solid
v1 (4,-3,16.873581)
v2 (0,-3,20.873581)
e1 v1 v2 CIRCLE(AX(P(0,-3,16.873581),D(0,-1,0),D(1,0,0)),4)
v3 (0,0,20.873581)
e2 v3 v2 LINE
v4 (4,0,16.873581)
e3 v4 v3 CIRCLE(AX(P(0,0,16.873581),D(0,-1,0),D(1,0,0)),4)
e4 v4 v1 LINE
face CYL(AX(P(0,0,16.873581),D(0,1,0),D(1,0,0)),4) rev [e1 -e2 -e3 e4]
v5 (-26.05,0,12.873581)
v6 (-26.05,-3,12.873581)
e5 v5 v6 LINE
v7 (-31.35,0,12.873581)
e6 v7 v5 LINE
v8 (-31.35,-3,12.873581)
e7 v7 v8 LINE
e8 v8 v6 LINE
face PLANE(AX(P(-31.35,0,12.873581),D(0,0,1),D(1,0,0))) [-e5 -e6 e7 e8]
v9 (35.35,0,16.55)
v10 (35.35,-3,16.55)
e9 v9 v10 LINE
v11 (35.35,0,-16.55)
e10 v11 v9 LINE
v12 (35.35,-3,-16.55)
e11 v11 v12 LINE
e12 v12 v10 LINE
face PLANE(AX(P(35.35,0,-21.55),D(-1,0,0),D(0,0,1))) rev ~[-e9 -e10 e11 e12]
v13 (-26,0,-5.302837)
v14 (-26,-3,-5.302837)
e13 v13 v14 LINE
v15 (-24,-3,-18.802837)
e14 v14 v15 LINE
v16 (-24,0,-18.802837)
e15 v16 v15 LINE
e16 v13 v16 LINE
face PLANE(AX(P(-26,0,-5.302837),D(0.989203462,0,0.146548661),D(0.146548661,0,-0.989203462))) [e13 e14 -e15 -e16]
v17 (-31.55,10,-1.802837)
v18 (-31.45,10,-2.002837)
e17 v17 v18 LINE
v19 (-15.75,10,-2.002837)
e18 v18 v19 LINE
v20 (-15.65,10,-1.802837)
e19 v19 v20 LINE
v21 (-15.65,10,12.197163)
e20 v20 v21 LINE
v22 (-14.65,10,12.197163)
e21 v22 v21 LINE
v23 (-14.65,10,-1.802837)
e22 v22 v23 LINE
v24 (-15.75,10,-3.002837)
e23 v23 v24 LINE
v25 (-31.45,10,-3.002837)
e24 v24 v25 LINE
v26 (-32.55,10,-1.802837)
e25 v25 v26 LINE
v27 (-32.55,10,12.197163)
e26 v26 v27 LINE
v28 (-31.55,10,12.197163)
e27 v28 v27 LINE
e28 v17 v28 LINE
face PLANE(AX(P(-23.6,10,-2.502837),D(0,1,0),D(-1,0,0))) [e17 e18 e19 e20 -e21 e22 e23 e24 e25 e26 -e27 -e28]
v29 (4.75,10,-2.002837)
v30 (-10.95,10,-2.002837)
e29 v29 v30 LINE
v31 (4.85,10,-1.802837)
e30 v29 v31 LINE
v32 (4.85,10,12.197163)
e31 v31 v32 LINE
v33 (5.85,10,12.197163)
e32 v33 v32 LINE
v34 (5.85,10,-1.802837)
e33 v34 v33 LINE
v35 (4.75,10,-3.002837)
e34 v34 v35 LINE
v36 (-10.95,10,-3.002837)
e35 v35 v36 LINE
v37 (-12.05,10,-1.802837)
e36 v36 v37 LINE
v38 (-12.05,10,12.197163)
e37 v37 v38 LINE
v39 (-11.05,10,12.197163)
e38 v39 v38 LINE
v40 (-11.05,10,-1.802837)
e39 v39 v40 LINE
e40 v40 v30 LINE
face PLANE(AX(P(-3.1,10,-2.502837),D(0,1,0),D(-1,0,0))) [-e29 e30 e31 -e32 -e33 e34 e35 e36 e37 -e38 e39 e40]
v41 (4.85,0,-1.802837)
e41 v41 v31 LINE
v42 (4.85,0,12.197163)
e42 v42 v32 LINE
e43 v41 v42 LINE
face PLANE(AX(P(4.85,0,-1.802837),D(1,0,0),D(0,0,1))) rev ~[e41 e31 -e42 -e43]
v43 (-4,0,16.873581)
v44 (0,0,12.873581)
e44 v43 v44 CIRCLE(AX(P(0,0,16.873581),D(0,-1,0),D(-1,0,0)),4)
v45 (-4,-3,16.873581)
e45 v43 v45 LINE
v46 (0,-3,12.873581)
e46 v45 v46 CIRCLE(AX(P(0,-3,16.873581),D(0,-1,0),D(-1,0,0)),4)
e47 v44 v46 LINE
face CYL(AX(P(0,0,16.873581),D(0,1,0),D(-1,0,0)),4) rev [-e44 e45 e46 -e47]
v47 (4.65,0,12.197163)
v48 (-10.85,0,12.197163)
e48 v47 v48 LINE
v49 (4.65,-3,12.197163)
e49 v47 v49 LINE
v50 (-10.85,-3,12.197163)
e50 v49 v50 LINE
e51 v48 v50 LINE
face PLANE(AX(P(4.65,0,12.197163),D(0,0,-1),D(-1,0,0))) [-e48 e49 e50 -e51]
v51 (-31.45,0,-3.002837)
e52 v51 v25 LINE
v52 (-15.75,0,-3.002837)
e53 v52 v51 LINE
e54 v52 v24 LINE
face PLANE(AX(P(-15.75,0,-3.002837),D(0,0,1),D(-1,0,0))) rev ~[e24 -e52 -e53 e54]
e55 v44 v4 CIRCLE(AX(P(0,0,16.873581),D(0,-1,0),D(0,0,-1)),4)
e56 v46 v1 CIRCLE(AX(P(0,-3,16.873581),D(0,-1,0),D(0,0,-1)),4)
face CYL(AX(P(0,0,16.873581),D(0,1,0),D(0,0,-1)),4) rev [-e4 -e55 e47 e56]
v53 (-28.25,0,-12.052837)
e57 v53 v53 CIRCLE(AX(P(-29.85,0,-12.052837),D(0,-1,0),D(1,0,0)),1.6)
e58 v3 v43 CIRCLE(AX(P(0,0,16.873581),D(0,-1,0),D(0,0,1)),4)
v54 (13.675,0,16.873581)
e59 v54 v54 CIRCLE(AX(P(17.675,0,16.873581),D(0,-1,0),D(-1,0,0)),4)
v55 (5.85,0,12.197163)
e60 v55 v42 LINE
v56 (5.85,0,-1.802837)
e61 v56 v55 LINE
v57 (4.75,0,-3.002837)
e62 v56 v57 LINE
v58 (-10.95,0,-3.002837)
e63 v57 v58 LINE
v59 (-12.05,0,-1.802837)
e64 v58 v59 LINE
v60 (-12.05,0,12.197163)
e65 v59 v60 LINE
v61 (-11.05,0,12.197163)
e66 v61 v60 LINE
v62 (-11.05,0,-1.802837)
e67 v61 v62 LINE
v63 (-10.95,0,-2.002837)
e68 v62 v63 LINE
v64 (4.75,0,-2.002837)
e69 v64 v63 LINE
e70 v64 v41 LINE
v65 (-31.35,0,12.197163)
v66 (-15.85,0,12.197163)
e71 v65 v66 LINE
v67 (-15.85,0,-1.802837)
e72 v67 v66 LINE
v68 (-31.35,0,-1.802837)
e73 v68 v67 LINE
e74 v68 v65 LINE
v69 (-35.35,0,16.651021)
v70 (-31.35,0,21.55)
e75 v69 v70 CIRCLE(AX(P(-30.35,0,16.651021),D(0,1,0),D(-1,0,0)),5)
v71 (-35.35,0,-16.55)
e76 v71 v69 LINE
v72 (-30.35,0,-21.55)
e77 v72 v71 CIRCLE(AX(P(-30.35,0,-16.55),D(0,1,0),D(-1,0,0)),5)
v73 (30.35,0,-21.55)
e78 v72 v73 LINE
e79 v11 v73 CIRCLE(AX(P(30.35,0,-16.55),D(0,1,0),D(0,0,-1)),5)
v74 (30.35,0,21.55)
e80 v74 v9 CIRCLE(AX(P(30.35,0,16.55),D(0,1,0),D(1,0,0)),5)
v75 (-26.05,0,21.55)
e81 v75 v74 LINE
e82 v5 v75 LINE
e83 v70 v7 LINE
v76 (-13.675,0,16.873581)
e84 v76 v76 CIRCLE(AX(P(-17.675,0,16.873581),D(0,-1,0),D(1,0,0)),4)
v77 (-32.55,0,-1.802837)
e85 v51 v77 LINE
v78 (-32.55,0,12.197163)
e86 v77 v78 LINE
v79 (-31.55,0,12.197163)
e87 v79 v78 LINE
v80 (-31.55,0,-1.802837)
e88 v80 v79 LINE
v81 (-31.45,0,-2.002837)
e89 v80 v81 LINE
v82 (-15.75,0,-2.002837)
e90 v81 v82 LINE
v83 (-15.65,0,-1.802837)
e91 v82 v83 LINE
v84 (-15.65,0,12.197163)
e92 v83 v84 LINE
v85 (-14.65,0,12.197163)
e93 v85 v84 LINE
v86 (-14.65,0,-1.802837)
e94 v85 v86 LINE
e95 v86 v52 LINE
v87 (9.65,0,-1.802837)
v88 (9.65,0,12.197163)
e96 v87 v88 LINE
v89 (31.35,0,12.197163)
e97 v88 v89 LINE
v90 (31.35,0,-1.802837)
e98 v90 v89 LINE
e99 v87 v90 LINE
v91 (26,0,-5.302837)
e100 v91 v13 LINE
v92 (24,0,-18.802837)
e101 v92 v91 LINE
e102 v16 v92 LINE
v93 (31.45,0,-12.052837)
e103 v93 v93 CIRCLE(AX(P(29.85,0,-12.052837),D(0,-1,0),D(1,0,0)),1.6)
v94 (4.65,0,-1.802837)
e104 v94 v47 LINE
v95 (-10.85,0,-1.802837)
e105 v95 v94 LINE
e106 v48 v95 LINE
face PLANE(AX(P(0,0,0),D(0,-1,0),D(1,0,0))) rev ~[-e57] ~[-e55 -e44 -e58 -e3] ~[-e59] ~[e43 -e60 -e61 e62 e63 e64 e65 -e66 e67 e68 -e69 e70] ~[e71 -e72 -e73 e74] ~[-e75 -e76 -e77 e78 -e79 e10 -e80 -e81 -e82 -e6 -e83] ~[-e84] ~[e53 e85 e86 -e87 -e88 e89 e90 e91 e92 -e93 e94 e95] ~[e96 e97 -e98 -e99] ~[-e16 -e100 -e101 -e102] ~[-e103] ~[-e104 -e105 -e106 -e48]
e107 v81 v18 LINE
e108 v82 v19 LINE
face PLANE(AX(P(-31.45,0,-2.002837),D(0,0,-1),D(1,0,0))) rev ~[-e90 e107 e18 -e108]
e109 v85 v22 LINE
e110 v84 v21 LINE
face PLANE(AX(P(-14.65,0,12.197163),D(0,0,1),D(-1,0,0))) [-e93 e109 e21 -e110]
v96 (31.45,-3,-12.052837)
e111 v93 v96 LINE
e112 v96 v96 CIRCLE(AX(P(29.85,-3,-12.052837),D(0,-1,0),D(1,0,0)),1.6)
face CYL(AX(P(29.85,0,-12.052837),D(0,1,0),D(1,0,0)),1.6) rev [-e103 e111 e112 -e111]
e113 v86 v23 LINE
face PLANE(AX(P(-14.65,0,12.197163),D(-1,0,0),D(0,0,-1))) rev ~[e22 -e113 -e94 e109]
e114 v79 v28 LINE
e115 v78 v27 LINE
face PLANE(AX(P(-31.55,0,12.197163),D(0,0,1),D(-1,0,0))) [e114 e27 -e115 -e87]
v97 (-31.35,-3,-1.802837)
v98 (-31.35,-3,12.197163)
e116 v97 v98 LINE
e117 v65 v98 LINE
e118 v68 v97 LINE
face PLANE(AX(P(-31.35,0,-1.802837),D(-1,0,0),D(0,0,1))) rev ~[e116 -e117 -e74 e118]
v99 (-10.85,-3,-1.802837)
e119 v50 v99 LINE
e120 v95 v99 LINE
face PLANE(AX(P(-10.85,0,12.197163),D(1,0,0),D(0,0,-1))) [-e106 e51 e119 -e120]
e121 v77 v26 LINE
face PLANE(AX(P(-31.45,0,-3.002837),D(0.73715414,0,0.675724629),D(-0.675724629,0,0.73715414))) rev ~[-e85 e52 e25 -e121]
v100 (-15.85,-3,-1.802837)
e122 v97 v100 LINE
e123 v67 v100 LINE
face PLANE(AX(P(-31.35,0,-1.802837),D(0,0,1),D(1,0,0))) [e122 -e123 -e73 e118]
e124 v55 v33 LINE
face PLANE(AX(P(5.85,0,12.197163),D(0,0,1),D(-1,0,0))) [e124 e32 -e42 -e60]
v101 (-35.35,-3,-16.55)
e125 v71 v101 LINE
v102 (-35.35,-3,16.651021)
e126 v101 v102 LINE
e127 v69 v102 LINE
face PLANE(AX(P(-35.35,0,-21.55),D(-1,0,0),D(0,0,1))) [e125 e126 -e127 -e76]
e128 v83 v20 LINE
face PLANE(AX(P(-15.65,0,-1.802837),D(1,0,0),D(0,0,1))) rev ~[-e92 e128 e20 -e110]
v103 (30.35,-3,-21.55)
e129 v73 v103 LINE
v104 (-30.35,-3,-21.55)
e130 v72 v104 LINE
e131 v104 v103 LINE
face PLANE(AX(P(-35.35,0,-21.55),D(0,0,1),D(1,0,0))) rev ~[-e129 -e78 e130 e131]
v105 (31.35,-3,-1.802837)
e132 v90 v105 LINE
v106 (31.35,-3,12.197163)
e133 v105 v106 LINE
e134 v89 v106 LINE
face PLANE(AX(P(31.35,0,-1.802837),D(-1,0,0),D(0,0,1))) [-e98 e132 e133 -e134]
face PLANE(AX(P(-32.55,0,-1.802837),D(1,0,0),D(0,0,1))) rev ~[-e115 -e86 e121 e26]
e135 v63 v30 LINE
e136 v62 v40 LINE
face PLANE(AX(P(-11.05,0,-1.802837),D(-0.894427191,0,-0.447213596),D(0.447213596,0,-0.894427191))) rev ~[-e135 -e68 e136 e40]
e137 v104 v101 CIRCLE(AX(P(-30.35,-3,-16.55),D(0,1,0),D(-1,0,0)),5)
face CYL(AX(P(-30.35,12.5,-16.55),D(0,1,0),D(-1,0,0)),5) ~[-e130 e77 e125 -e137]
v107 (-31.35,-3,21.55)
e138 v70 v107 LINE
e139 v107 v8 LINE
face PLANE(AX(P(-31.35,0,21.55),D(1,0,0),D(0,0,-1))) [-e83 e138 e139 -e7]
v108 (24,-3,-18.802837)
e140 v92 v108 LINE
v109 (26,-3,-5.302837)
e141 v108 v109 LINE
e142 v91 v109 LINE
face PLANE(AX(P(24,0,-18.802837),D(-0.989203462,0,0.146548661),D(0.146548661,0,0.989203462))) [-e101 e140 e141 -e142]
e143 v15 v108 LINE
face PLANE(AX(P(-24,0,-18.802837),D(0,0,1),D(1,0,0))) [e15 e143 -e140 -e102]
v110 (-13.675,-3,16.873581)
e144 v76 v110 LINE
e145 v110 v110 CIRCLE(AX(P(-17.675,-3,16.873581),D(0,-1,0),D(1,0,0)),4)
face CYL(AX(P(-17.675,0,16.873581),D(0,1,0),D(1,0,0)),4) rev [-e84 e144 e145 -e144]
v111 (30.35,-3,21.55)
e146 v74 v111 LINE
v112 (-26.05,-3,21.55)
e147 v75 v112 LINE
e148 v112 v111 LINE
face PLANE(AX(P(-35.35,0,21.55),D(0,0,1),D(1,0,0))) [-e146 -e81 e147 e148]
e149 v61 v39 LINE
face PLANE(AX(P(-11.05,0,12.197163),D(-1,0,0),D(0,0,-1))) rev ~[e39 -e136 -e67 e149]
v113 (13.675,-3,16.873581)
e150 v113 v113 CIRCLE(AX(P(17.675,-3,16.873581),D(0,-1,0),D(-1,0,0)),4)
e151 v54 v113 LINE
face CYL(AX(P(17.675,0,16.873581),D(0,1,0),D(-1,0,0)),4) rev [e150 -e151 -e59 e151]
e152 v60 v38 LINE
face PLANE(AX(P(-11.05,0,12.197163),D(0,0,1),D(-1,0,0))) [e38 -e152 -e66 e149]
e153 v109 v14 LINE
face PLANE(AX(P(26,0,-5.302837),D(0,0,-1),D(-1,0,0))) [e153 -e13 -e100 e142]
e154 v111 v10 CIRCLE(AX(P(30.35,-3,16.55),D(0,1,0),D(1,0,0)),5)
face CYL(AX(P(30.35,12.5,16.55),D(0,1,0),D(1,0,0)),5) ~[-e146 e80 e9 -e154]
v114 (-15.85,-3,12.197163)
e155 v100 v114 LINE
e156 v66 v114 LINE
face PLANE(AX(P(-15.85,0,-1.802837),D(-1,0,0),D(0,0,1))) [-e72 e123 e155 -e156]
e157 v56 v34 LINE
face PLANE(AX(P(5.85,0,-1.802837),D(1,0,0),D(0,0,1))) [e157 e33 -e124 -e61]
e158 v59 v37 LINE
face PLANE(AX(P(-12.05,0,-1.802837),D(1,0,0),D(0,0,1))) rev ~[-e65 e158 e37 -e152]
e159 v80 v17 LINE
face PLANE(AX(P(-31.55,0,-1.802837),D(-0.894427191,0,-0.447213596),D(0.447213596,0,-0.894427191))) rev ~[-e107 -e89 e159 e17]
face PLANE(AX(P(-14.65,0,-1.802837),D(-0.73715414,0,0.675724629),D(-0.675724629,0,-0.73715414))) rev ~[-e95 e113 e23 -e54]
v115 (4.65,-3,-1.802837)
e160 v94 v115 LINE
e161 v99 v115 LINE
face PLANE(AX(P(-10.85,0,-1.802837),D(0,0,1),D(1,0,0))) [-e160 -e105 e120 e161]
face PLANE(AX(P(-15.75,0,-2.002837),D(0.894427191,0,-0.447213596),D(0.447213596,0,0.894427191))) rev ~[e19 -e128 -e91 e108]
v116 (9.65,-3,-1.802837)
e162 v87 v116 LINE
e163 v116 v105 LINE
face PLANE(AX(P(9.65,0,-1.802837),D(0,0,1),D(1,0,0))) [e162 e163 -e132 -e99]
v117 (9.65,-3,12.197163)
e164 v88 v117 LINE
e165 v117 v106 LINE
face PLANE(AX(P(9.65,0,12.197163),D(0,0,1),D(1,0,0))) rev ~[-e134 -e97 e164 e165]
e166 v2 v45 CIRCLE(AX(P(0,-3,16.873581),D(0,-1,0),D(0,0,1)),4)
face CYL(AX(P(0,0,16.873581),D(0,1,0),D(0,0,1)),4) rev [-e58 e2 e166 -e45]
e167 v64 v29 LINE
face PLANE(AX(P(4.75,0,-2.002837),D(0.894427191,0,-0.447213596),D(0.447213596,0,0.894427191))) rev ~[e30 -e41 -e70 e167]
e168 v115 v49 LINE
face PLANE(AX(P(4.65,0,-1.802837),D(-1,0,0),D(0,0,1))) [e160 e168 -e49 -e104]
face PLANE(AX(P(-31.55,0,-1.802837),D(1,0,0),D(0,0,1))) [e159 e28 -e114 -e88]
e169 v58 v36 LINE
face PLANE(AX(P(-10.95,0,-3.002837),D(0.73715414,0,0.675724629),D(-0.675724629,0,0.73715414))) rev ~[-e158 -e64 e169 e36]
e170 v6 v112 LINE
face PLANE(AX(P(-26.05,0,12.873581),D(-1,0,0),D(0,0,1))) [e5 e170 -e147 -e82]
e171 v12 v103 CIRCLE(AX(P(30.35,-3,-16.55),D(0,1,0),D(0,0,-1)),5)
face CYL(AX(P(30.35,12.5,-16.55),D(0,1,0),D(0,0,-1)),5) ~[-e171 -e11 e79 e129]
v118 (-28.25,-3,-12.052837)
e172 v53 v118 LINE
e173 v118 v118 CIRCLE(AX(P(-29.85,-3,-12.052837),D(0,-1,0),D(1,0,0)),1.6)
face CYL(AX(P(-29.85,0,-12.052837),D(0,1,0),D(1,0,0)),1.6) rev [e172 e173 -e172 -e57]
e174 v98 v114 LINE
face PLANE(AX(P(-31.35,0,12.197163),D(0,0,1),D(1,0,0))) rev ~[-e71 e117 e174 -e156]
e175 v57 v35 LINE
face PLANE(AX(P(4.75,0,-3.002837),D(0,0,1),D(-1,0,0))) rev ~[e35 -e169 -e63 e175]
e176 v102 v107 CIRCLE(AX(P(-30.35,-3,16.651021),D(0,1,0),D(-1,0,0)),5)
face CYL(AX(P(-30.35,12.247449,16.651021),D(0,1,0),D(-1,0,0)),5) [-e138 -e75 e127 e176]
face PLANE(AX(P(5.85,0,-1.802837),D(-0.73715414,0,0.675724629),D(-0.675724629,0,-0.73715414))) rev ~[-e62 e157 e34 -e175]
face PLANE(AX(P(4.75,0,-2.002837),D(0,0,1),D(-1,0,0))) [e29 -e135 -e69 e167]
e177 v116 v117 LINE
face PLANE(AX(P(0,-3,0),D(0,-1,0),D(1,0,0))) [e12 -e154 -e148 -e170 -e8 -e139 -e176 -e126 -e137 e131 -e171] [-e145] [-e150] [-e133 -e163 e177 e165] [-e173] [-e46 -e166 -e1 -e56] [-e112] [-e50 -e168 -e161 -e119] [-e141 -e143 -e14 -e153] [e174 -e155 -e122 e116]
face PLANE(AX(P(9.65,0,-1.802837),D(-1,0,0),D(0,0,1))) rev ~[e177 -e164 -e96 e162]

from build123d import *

# Parameters (mm, degrees)
F0_W        = 70.7
F0_H        = 43.1
F3_DEPTH    = 3
F1_R        = 1.6
F4_DEPTH    = 3
F2_W        = 15.5
F2_H        = 14
F2_W_2      = 5.3
F2_H_2      = 4
F2_H_3      = 4.6764186437
F2_W_3      = 21.7
F5_DEPTH    = 3
F6_T1_DEPTH = 27.4948974279
F6_T3_DEPTH = 28
F7_W        = 1
F7_H        = 14
F7_H_2      = 7
F7_W_2      = 15.7
F7_H_3      = 1
F8_DEPTH    = 10


# Not quite as in the source:
# - a fillet or chamfer that OpenCascade refuses, or shapes differently, is made with other operations: its cross-section is extruded or revolved along the edge and cut away or added


with BuildPart() as f3:
    # F0 (on Front) → F3 (new body)
    with BuildSketch(Plane.XZ):
        Rectangle(F0_W, F0_H)
    extrude(amount=F3_DEPTH)

    # F1 (on face) → F4 (cut)
    with BuildSketch(Plane.XZ):
        Polygon((0, -12.0528372875), (0, -18.8028372875), (24, -18.8028372875), (26, -5.3028372875), (0, -5.3028372875), align=None)
        Polygon((-24, -18.8028372875), (0, -18.8028372875), (0, -12.0528372875), (-25, -12.0528372875), align=None)
        with Locations((-29.85, -12.0528372875)):
            Circle(F1_R)
        Polygon((-25, -12.0528372875), (0, -12.0528372875), (0, -5.3028372875), (-26, -5.3028372875), align=None)
        with Locations((29.85, -12.0528372875)):
            Circle(F1_R)
    extrude(amount=F4_DEPTH, mode=Mode.SUBTRACT)

    # F2 (on face) → F5 (cut)
    with BuildSketch(Plane.XZ):
        with Locations((-23.6, 5.1971627125)):
            Rectangle(F2_W, F2_H)
        with Locations((-28.7, 14.8735813563)):
            Rectangle(F2_W_2, F2_H_2)
        with Locations((-28.7, 19.2117906781)):
            Rectangle(F2_W_2, F2_H_3)
        with BuildLine():
            ThreePointArc((-21.675, 16.8735813563), (-17.675, 12.8735813563), (-13.675, 16.8735813563))
            Line((-13.675, 16.8735813563), (-21.675, 16.8735813563))
        make_face()
        with BuildLine():
            Line((-21.675, 16.8735813563), (-13.675, 16.8735813563))
            ThreePointArc((-13.675, 16.8735813563), (-17.675, 20.8735813563), (-21.675, 16.8735813563))
        make_face()
        with BuildLine():
            ThreePointArc((21.675, 16.8735813563), (17.675, 20.8735813563), (13.675, 16.8735813563))
            Line((13.675, 16.8735813563), (21.675, 16.8735813563))
        make_face()
        with BuildLine():
            Line((21.675, 16.8735813563), (13.675, 16.8735813563))
            ThreePointArc((13.675, 16.8735813563), (17.675, 12.8735813563), (21.675, 16.8735813563))
        make_face()
        with BuildLine():
            ThreePointArc((-4, 16.8735813563), (-2.8284271247, 14.0451542315), (0, 12.8735813563))
            Line((0, 12.8735813563), (0, 16.8735813563))
            Line((0, 16.8735813563), (-4, 16.8735813563))
        make_face()
        with BuildLine():
            Line((0, 16.8735813563), (0, 12.8735813563))
            ThreePointArc((0, 12.8735813563), (2.8284271247, 14.0451542315), (4, 16.8735813563))
            Line((4, 16.8735813563), (0, 16.8735813563))
        make_face()
        with Locations((20.5, 5.1971627125)):
            Rectangle(F2_W_3, F2_H)
        Polygon((-10.85, 12.1971627125), (-10.85, -1.8028372875), (4.65, -1.8028372875), (4.65, 12.1971627125), (0, 12.1971627125), align=None)
        with BuildLine():
            Line((-4, 16.8735813563), (0, 16.8735813563))
            Line((0, 16.8735813563), (0, 20.8735813563))
            ThreePointArc((0, 20.8735813563), (-2.8284271247, 19.702008481), (-4, 16.8735813563))
        make_face()
        with BuildLine():
            Line((0, 20.8735813563), (0, 16.8735813563))
            Line((0, 16.8735813563), (4, 16.8735813563))
            ThreePointArc((4, 16.8735813563), (2.8284271247, 19.702008481), (0, 20.8735813563))
        make_face()
    extrude(amount=F5_DEPTH, mode=Mode.SUBTRACT)

    # F6: fillet of radius 5 on 4 edges, made by hand

    # F6_s2 → F6_t1 (cut)
    with BuildSketch(Plane.XZ.offset(-12.2474487139)):
        with BuildLine():
            ThreePointArc((-35.35, 16.6510205144), (-34.2229833462, 19.8132981746), (-31.35, 21.55))
            Line((-31.35, 21.55), (-35.35, 21.55))
            Line((-35.35, 21.55), (-35.35, 16.6510205144))
        make_face()
    extrude(amount=F6_T1_DEPTH, mode=Mode.SUBTRACT)

    # F6_s4 → F6_t3 (cut)
    with BuildSketch(Plane.XZ.offset(-12.5)):
        with BuildLine():
            ThreePointArc((35.35, 16.55), (33.8855339059, 20.0855339059), (30.35, 21.55))
            Line((30.35, 21.55), (35.35, 21.55))
            Line((35.35, 21.55), (35.35, 16.55))
        make_face()
        with BuildLine():
            ThreePointArc((30.35, -21.55), (33.8855339059, -20.0855339059), (35.35, -16.55))
            Line((35.35, -16.55), (35.35, -21.55))
            Line((35.35, -21.55), (30.35, -21.55))
        make_face()
        with BuildLine():
            ThreePointArc((-35.35, -16.55), (-33.8855339059, -20.0855339059), (-30.35, -21.55))
            Line((-30.35, -21.55), (-35.35, -21.55))
            Line((-35.35, -21.55), (-35.35, -16.55))
        make_face()
    extrude(amount=F6_T3_DEPTH, mode=Mode.SUBTRACT)

    # F7 (on face) → F8 (join)
    with BuildSketch(Plane(origin=(0, 0, 0), x_dir=(-1, 0, 0), z_dir=(0, 1, 0))):
        Polygon((15.75, -2.0028372875), (15.75, -3.0028372875), (31.45, -3.0028372875), (31.45, -2.0028372875), (23.6, -2.0028372875), align=None)
        Polygon((31.45, -2.0028372875), (31.45, -3.0028372875), (32.55, -1.8028372875), (31.55, -1.8028372875), align=None)
        with Locations((32.05, 5.1971627125)):
            Rectangle(F7_W, F7_H)
        Polygon((14.65, -1.8028372875), (15.75, -3.0028372875), (15.75, -2.0028372875), (15.65, -1.8028372875), align=None)
        with Locations((15.15, 1.6971627125)):
            Rectangle(F7_W, F7_H_2)
        with Locations((15.15, 8.6971627125)):
            Rectangle(F7_W, F7_H_2)
        with Locations((3.1, -2.5028372875)):
            Rectangle(F7_W_2, F7_H_3)
        Polygon((-5.85, -1.8028372875), (-4.75, -3.0028372875), (-4.75, -2.0028372875), (-4.85, -1.8028372875), align=None)
        with Locations((-5.35, 5.1971627125)):
            Rectangle(F7_W, F7_H)
        with Locations((11.55, 1.6971627125)):
            Rectangle(F7_W, F7_H_2)
        with Locations((11.55, 8.6971627125)):
            Rectangle(F7_W, F7_H_2)
        Polygon((10.95, -3.0028372875), (12.05, -1.8028372875), (11.05, -1.8028372875), (10.95, -2.0028372875), align=None)
    extrude(amount=F8_DEPTH)


solid = f3.part
